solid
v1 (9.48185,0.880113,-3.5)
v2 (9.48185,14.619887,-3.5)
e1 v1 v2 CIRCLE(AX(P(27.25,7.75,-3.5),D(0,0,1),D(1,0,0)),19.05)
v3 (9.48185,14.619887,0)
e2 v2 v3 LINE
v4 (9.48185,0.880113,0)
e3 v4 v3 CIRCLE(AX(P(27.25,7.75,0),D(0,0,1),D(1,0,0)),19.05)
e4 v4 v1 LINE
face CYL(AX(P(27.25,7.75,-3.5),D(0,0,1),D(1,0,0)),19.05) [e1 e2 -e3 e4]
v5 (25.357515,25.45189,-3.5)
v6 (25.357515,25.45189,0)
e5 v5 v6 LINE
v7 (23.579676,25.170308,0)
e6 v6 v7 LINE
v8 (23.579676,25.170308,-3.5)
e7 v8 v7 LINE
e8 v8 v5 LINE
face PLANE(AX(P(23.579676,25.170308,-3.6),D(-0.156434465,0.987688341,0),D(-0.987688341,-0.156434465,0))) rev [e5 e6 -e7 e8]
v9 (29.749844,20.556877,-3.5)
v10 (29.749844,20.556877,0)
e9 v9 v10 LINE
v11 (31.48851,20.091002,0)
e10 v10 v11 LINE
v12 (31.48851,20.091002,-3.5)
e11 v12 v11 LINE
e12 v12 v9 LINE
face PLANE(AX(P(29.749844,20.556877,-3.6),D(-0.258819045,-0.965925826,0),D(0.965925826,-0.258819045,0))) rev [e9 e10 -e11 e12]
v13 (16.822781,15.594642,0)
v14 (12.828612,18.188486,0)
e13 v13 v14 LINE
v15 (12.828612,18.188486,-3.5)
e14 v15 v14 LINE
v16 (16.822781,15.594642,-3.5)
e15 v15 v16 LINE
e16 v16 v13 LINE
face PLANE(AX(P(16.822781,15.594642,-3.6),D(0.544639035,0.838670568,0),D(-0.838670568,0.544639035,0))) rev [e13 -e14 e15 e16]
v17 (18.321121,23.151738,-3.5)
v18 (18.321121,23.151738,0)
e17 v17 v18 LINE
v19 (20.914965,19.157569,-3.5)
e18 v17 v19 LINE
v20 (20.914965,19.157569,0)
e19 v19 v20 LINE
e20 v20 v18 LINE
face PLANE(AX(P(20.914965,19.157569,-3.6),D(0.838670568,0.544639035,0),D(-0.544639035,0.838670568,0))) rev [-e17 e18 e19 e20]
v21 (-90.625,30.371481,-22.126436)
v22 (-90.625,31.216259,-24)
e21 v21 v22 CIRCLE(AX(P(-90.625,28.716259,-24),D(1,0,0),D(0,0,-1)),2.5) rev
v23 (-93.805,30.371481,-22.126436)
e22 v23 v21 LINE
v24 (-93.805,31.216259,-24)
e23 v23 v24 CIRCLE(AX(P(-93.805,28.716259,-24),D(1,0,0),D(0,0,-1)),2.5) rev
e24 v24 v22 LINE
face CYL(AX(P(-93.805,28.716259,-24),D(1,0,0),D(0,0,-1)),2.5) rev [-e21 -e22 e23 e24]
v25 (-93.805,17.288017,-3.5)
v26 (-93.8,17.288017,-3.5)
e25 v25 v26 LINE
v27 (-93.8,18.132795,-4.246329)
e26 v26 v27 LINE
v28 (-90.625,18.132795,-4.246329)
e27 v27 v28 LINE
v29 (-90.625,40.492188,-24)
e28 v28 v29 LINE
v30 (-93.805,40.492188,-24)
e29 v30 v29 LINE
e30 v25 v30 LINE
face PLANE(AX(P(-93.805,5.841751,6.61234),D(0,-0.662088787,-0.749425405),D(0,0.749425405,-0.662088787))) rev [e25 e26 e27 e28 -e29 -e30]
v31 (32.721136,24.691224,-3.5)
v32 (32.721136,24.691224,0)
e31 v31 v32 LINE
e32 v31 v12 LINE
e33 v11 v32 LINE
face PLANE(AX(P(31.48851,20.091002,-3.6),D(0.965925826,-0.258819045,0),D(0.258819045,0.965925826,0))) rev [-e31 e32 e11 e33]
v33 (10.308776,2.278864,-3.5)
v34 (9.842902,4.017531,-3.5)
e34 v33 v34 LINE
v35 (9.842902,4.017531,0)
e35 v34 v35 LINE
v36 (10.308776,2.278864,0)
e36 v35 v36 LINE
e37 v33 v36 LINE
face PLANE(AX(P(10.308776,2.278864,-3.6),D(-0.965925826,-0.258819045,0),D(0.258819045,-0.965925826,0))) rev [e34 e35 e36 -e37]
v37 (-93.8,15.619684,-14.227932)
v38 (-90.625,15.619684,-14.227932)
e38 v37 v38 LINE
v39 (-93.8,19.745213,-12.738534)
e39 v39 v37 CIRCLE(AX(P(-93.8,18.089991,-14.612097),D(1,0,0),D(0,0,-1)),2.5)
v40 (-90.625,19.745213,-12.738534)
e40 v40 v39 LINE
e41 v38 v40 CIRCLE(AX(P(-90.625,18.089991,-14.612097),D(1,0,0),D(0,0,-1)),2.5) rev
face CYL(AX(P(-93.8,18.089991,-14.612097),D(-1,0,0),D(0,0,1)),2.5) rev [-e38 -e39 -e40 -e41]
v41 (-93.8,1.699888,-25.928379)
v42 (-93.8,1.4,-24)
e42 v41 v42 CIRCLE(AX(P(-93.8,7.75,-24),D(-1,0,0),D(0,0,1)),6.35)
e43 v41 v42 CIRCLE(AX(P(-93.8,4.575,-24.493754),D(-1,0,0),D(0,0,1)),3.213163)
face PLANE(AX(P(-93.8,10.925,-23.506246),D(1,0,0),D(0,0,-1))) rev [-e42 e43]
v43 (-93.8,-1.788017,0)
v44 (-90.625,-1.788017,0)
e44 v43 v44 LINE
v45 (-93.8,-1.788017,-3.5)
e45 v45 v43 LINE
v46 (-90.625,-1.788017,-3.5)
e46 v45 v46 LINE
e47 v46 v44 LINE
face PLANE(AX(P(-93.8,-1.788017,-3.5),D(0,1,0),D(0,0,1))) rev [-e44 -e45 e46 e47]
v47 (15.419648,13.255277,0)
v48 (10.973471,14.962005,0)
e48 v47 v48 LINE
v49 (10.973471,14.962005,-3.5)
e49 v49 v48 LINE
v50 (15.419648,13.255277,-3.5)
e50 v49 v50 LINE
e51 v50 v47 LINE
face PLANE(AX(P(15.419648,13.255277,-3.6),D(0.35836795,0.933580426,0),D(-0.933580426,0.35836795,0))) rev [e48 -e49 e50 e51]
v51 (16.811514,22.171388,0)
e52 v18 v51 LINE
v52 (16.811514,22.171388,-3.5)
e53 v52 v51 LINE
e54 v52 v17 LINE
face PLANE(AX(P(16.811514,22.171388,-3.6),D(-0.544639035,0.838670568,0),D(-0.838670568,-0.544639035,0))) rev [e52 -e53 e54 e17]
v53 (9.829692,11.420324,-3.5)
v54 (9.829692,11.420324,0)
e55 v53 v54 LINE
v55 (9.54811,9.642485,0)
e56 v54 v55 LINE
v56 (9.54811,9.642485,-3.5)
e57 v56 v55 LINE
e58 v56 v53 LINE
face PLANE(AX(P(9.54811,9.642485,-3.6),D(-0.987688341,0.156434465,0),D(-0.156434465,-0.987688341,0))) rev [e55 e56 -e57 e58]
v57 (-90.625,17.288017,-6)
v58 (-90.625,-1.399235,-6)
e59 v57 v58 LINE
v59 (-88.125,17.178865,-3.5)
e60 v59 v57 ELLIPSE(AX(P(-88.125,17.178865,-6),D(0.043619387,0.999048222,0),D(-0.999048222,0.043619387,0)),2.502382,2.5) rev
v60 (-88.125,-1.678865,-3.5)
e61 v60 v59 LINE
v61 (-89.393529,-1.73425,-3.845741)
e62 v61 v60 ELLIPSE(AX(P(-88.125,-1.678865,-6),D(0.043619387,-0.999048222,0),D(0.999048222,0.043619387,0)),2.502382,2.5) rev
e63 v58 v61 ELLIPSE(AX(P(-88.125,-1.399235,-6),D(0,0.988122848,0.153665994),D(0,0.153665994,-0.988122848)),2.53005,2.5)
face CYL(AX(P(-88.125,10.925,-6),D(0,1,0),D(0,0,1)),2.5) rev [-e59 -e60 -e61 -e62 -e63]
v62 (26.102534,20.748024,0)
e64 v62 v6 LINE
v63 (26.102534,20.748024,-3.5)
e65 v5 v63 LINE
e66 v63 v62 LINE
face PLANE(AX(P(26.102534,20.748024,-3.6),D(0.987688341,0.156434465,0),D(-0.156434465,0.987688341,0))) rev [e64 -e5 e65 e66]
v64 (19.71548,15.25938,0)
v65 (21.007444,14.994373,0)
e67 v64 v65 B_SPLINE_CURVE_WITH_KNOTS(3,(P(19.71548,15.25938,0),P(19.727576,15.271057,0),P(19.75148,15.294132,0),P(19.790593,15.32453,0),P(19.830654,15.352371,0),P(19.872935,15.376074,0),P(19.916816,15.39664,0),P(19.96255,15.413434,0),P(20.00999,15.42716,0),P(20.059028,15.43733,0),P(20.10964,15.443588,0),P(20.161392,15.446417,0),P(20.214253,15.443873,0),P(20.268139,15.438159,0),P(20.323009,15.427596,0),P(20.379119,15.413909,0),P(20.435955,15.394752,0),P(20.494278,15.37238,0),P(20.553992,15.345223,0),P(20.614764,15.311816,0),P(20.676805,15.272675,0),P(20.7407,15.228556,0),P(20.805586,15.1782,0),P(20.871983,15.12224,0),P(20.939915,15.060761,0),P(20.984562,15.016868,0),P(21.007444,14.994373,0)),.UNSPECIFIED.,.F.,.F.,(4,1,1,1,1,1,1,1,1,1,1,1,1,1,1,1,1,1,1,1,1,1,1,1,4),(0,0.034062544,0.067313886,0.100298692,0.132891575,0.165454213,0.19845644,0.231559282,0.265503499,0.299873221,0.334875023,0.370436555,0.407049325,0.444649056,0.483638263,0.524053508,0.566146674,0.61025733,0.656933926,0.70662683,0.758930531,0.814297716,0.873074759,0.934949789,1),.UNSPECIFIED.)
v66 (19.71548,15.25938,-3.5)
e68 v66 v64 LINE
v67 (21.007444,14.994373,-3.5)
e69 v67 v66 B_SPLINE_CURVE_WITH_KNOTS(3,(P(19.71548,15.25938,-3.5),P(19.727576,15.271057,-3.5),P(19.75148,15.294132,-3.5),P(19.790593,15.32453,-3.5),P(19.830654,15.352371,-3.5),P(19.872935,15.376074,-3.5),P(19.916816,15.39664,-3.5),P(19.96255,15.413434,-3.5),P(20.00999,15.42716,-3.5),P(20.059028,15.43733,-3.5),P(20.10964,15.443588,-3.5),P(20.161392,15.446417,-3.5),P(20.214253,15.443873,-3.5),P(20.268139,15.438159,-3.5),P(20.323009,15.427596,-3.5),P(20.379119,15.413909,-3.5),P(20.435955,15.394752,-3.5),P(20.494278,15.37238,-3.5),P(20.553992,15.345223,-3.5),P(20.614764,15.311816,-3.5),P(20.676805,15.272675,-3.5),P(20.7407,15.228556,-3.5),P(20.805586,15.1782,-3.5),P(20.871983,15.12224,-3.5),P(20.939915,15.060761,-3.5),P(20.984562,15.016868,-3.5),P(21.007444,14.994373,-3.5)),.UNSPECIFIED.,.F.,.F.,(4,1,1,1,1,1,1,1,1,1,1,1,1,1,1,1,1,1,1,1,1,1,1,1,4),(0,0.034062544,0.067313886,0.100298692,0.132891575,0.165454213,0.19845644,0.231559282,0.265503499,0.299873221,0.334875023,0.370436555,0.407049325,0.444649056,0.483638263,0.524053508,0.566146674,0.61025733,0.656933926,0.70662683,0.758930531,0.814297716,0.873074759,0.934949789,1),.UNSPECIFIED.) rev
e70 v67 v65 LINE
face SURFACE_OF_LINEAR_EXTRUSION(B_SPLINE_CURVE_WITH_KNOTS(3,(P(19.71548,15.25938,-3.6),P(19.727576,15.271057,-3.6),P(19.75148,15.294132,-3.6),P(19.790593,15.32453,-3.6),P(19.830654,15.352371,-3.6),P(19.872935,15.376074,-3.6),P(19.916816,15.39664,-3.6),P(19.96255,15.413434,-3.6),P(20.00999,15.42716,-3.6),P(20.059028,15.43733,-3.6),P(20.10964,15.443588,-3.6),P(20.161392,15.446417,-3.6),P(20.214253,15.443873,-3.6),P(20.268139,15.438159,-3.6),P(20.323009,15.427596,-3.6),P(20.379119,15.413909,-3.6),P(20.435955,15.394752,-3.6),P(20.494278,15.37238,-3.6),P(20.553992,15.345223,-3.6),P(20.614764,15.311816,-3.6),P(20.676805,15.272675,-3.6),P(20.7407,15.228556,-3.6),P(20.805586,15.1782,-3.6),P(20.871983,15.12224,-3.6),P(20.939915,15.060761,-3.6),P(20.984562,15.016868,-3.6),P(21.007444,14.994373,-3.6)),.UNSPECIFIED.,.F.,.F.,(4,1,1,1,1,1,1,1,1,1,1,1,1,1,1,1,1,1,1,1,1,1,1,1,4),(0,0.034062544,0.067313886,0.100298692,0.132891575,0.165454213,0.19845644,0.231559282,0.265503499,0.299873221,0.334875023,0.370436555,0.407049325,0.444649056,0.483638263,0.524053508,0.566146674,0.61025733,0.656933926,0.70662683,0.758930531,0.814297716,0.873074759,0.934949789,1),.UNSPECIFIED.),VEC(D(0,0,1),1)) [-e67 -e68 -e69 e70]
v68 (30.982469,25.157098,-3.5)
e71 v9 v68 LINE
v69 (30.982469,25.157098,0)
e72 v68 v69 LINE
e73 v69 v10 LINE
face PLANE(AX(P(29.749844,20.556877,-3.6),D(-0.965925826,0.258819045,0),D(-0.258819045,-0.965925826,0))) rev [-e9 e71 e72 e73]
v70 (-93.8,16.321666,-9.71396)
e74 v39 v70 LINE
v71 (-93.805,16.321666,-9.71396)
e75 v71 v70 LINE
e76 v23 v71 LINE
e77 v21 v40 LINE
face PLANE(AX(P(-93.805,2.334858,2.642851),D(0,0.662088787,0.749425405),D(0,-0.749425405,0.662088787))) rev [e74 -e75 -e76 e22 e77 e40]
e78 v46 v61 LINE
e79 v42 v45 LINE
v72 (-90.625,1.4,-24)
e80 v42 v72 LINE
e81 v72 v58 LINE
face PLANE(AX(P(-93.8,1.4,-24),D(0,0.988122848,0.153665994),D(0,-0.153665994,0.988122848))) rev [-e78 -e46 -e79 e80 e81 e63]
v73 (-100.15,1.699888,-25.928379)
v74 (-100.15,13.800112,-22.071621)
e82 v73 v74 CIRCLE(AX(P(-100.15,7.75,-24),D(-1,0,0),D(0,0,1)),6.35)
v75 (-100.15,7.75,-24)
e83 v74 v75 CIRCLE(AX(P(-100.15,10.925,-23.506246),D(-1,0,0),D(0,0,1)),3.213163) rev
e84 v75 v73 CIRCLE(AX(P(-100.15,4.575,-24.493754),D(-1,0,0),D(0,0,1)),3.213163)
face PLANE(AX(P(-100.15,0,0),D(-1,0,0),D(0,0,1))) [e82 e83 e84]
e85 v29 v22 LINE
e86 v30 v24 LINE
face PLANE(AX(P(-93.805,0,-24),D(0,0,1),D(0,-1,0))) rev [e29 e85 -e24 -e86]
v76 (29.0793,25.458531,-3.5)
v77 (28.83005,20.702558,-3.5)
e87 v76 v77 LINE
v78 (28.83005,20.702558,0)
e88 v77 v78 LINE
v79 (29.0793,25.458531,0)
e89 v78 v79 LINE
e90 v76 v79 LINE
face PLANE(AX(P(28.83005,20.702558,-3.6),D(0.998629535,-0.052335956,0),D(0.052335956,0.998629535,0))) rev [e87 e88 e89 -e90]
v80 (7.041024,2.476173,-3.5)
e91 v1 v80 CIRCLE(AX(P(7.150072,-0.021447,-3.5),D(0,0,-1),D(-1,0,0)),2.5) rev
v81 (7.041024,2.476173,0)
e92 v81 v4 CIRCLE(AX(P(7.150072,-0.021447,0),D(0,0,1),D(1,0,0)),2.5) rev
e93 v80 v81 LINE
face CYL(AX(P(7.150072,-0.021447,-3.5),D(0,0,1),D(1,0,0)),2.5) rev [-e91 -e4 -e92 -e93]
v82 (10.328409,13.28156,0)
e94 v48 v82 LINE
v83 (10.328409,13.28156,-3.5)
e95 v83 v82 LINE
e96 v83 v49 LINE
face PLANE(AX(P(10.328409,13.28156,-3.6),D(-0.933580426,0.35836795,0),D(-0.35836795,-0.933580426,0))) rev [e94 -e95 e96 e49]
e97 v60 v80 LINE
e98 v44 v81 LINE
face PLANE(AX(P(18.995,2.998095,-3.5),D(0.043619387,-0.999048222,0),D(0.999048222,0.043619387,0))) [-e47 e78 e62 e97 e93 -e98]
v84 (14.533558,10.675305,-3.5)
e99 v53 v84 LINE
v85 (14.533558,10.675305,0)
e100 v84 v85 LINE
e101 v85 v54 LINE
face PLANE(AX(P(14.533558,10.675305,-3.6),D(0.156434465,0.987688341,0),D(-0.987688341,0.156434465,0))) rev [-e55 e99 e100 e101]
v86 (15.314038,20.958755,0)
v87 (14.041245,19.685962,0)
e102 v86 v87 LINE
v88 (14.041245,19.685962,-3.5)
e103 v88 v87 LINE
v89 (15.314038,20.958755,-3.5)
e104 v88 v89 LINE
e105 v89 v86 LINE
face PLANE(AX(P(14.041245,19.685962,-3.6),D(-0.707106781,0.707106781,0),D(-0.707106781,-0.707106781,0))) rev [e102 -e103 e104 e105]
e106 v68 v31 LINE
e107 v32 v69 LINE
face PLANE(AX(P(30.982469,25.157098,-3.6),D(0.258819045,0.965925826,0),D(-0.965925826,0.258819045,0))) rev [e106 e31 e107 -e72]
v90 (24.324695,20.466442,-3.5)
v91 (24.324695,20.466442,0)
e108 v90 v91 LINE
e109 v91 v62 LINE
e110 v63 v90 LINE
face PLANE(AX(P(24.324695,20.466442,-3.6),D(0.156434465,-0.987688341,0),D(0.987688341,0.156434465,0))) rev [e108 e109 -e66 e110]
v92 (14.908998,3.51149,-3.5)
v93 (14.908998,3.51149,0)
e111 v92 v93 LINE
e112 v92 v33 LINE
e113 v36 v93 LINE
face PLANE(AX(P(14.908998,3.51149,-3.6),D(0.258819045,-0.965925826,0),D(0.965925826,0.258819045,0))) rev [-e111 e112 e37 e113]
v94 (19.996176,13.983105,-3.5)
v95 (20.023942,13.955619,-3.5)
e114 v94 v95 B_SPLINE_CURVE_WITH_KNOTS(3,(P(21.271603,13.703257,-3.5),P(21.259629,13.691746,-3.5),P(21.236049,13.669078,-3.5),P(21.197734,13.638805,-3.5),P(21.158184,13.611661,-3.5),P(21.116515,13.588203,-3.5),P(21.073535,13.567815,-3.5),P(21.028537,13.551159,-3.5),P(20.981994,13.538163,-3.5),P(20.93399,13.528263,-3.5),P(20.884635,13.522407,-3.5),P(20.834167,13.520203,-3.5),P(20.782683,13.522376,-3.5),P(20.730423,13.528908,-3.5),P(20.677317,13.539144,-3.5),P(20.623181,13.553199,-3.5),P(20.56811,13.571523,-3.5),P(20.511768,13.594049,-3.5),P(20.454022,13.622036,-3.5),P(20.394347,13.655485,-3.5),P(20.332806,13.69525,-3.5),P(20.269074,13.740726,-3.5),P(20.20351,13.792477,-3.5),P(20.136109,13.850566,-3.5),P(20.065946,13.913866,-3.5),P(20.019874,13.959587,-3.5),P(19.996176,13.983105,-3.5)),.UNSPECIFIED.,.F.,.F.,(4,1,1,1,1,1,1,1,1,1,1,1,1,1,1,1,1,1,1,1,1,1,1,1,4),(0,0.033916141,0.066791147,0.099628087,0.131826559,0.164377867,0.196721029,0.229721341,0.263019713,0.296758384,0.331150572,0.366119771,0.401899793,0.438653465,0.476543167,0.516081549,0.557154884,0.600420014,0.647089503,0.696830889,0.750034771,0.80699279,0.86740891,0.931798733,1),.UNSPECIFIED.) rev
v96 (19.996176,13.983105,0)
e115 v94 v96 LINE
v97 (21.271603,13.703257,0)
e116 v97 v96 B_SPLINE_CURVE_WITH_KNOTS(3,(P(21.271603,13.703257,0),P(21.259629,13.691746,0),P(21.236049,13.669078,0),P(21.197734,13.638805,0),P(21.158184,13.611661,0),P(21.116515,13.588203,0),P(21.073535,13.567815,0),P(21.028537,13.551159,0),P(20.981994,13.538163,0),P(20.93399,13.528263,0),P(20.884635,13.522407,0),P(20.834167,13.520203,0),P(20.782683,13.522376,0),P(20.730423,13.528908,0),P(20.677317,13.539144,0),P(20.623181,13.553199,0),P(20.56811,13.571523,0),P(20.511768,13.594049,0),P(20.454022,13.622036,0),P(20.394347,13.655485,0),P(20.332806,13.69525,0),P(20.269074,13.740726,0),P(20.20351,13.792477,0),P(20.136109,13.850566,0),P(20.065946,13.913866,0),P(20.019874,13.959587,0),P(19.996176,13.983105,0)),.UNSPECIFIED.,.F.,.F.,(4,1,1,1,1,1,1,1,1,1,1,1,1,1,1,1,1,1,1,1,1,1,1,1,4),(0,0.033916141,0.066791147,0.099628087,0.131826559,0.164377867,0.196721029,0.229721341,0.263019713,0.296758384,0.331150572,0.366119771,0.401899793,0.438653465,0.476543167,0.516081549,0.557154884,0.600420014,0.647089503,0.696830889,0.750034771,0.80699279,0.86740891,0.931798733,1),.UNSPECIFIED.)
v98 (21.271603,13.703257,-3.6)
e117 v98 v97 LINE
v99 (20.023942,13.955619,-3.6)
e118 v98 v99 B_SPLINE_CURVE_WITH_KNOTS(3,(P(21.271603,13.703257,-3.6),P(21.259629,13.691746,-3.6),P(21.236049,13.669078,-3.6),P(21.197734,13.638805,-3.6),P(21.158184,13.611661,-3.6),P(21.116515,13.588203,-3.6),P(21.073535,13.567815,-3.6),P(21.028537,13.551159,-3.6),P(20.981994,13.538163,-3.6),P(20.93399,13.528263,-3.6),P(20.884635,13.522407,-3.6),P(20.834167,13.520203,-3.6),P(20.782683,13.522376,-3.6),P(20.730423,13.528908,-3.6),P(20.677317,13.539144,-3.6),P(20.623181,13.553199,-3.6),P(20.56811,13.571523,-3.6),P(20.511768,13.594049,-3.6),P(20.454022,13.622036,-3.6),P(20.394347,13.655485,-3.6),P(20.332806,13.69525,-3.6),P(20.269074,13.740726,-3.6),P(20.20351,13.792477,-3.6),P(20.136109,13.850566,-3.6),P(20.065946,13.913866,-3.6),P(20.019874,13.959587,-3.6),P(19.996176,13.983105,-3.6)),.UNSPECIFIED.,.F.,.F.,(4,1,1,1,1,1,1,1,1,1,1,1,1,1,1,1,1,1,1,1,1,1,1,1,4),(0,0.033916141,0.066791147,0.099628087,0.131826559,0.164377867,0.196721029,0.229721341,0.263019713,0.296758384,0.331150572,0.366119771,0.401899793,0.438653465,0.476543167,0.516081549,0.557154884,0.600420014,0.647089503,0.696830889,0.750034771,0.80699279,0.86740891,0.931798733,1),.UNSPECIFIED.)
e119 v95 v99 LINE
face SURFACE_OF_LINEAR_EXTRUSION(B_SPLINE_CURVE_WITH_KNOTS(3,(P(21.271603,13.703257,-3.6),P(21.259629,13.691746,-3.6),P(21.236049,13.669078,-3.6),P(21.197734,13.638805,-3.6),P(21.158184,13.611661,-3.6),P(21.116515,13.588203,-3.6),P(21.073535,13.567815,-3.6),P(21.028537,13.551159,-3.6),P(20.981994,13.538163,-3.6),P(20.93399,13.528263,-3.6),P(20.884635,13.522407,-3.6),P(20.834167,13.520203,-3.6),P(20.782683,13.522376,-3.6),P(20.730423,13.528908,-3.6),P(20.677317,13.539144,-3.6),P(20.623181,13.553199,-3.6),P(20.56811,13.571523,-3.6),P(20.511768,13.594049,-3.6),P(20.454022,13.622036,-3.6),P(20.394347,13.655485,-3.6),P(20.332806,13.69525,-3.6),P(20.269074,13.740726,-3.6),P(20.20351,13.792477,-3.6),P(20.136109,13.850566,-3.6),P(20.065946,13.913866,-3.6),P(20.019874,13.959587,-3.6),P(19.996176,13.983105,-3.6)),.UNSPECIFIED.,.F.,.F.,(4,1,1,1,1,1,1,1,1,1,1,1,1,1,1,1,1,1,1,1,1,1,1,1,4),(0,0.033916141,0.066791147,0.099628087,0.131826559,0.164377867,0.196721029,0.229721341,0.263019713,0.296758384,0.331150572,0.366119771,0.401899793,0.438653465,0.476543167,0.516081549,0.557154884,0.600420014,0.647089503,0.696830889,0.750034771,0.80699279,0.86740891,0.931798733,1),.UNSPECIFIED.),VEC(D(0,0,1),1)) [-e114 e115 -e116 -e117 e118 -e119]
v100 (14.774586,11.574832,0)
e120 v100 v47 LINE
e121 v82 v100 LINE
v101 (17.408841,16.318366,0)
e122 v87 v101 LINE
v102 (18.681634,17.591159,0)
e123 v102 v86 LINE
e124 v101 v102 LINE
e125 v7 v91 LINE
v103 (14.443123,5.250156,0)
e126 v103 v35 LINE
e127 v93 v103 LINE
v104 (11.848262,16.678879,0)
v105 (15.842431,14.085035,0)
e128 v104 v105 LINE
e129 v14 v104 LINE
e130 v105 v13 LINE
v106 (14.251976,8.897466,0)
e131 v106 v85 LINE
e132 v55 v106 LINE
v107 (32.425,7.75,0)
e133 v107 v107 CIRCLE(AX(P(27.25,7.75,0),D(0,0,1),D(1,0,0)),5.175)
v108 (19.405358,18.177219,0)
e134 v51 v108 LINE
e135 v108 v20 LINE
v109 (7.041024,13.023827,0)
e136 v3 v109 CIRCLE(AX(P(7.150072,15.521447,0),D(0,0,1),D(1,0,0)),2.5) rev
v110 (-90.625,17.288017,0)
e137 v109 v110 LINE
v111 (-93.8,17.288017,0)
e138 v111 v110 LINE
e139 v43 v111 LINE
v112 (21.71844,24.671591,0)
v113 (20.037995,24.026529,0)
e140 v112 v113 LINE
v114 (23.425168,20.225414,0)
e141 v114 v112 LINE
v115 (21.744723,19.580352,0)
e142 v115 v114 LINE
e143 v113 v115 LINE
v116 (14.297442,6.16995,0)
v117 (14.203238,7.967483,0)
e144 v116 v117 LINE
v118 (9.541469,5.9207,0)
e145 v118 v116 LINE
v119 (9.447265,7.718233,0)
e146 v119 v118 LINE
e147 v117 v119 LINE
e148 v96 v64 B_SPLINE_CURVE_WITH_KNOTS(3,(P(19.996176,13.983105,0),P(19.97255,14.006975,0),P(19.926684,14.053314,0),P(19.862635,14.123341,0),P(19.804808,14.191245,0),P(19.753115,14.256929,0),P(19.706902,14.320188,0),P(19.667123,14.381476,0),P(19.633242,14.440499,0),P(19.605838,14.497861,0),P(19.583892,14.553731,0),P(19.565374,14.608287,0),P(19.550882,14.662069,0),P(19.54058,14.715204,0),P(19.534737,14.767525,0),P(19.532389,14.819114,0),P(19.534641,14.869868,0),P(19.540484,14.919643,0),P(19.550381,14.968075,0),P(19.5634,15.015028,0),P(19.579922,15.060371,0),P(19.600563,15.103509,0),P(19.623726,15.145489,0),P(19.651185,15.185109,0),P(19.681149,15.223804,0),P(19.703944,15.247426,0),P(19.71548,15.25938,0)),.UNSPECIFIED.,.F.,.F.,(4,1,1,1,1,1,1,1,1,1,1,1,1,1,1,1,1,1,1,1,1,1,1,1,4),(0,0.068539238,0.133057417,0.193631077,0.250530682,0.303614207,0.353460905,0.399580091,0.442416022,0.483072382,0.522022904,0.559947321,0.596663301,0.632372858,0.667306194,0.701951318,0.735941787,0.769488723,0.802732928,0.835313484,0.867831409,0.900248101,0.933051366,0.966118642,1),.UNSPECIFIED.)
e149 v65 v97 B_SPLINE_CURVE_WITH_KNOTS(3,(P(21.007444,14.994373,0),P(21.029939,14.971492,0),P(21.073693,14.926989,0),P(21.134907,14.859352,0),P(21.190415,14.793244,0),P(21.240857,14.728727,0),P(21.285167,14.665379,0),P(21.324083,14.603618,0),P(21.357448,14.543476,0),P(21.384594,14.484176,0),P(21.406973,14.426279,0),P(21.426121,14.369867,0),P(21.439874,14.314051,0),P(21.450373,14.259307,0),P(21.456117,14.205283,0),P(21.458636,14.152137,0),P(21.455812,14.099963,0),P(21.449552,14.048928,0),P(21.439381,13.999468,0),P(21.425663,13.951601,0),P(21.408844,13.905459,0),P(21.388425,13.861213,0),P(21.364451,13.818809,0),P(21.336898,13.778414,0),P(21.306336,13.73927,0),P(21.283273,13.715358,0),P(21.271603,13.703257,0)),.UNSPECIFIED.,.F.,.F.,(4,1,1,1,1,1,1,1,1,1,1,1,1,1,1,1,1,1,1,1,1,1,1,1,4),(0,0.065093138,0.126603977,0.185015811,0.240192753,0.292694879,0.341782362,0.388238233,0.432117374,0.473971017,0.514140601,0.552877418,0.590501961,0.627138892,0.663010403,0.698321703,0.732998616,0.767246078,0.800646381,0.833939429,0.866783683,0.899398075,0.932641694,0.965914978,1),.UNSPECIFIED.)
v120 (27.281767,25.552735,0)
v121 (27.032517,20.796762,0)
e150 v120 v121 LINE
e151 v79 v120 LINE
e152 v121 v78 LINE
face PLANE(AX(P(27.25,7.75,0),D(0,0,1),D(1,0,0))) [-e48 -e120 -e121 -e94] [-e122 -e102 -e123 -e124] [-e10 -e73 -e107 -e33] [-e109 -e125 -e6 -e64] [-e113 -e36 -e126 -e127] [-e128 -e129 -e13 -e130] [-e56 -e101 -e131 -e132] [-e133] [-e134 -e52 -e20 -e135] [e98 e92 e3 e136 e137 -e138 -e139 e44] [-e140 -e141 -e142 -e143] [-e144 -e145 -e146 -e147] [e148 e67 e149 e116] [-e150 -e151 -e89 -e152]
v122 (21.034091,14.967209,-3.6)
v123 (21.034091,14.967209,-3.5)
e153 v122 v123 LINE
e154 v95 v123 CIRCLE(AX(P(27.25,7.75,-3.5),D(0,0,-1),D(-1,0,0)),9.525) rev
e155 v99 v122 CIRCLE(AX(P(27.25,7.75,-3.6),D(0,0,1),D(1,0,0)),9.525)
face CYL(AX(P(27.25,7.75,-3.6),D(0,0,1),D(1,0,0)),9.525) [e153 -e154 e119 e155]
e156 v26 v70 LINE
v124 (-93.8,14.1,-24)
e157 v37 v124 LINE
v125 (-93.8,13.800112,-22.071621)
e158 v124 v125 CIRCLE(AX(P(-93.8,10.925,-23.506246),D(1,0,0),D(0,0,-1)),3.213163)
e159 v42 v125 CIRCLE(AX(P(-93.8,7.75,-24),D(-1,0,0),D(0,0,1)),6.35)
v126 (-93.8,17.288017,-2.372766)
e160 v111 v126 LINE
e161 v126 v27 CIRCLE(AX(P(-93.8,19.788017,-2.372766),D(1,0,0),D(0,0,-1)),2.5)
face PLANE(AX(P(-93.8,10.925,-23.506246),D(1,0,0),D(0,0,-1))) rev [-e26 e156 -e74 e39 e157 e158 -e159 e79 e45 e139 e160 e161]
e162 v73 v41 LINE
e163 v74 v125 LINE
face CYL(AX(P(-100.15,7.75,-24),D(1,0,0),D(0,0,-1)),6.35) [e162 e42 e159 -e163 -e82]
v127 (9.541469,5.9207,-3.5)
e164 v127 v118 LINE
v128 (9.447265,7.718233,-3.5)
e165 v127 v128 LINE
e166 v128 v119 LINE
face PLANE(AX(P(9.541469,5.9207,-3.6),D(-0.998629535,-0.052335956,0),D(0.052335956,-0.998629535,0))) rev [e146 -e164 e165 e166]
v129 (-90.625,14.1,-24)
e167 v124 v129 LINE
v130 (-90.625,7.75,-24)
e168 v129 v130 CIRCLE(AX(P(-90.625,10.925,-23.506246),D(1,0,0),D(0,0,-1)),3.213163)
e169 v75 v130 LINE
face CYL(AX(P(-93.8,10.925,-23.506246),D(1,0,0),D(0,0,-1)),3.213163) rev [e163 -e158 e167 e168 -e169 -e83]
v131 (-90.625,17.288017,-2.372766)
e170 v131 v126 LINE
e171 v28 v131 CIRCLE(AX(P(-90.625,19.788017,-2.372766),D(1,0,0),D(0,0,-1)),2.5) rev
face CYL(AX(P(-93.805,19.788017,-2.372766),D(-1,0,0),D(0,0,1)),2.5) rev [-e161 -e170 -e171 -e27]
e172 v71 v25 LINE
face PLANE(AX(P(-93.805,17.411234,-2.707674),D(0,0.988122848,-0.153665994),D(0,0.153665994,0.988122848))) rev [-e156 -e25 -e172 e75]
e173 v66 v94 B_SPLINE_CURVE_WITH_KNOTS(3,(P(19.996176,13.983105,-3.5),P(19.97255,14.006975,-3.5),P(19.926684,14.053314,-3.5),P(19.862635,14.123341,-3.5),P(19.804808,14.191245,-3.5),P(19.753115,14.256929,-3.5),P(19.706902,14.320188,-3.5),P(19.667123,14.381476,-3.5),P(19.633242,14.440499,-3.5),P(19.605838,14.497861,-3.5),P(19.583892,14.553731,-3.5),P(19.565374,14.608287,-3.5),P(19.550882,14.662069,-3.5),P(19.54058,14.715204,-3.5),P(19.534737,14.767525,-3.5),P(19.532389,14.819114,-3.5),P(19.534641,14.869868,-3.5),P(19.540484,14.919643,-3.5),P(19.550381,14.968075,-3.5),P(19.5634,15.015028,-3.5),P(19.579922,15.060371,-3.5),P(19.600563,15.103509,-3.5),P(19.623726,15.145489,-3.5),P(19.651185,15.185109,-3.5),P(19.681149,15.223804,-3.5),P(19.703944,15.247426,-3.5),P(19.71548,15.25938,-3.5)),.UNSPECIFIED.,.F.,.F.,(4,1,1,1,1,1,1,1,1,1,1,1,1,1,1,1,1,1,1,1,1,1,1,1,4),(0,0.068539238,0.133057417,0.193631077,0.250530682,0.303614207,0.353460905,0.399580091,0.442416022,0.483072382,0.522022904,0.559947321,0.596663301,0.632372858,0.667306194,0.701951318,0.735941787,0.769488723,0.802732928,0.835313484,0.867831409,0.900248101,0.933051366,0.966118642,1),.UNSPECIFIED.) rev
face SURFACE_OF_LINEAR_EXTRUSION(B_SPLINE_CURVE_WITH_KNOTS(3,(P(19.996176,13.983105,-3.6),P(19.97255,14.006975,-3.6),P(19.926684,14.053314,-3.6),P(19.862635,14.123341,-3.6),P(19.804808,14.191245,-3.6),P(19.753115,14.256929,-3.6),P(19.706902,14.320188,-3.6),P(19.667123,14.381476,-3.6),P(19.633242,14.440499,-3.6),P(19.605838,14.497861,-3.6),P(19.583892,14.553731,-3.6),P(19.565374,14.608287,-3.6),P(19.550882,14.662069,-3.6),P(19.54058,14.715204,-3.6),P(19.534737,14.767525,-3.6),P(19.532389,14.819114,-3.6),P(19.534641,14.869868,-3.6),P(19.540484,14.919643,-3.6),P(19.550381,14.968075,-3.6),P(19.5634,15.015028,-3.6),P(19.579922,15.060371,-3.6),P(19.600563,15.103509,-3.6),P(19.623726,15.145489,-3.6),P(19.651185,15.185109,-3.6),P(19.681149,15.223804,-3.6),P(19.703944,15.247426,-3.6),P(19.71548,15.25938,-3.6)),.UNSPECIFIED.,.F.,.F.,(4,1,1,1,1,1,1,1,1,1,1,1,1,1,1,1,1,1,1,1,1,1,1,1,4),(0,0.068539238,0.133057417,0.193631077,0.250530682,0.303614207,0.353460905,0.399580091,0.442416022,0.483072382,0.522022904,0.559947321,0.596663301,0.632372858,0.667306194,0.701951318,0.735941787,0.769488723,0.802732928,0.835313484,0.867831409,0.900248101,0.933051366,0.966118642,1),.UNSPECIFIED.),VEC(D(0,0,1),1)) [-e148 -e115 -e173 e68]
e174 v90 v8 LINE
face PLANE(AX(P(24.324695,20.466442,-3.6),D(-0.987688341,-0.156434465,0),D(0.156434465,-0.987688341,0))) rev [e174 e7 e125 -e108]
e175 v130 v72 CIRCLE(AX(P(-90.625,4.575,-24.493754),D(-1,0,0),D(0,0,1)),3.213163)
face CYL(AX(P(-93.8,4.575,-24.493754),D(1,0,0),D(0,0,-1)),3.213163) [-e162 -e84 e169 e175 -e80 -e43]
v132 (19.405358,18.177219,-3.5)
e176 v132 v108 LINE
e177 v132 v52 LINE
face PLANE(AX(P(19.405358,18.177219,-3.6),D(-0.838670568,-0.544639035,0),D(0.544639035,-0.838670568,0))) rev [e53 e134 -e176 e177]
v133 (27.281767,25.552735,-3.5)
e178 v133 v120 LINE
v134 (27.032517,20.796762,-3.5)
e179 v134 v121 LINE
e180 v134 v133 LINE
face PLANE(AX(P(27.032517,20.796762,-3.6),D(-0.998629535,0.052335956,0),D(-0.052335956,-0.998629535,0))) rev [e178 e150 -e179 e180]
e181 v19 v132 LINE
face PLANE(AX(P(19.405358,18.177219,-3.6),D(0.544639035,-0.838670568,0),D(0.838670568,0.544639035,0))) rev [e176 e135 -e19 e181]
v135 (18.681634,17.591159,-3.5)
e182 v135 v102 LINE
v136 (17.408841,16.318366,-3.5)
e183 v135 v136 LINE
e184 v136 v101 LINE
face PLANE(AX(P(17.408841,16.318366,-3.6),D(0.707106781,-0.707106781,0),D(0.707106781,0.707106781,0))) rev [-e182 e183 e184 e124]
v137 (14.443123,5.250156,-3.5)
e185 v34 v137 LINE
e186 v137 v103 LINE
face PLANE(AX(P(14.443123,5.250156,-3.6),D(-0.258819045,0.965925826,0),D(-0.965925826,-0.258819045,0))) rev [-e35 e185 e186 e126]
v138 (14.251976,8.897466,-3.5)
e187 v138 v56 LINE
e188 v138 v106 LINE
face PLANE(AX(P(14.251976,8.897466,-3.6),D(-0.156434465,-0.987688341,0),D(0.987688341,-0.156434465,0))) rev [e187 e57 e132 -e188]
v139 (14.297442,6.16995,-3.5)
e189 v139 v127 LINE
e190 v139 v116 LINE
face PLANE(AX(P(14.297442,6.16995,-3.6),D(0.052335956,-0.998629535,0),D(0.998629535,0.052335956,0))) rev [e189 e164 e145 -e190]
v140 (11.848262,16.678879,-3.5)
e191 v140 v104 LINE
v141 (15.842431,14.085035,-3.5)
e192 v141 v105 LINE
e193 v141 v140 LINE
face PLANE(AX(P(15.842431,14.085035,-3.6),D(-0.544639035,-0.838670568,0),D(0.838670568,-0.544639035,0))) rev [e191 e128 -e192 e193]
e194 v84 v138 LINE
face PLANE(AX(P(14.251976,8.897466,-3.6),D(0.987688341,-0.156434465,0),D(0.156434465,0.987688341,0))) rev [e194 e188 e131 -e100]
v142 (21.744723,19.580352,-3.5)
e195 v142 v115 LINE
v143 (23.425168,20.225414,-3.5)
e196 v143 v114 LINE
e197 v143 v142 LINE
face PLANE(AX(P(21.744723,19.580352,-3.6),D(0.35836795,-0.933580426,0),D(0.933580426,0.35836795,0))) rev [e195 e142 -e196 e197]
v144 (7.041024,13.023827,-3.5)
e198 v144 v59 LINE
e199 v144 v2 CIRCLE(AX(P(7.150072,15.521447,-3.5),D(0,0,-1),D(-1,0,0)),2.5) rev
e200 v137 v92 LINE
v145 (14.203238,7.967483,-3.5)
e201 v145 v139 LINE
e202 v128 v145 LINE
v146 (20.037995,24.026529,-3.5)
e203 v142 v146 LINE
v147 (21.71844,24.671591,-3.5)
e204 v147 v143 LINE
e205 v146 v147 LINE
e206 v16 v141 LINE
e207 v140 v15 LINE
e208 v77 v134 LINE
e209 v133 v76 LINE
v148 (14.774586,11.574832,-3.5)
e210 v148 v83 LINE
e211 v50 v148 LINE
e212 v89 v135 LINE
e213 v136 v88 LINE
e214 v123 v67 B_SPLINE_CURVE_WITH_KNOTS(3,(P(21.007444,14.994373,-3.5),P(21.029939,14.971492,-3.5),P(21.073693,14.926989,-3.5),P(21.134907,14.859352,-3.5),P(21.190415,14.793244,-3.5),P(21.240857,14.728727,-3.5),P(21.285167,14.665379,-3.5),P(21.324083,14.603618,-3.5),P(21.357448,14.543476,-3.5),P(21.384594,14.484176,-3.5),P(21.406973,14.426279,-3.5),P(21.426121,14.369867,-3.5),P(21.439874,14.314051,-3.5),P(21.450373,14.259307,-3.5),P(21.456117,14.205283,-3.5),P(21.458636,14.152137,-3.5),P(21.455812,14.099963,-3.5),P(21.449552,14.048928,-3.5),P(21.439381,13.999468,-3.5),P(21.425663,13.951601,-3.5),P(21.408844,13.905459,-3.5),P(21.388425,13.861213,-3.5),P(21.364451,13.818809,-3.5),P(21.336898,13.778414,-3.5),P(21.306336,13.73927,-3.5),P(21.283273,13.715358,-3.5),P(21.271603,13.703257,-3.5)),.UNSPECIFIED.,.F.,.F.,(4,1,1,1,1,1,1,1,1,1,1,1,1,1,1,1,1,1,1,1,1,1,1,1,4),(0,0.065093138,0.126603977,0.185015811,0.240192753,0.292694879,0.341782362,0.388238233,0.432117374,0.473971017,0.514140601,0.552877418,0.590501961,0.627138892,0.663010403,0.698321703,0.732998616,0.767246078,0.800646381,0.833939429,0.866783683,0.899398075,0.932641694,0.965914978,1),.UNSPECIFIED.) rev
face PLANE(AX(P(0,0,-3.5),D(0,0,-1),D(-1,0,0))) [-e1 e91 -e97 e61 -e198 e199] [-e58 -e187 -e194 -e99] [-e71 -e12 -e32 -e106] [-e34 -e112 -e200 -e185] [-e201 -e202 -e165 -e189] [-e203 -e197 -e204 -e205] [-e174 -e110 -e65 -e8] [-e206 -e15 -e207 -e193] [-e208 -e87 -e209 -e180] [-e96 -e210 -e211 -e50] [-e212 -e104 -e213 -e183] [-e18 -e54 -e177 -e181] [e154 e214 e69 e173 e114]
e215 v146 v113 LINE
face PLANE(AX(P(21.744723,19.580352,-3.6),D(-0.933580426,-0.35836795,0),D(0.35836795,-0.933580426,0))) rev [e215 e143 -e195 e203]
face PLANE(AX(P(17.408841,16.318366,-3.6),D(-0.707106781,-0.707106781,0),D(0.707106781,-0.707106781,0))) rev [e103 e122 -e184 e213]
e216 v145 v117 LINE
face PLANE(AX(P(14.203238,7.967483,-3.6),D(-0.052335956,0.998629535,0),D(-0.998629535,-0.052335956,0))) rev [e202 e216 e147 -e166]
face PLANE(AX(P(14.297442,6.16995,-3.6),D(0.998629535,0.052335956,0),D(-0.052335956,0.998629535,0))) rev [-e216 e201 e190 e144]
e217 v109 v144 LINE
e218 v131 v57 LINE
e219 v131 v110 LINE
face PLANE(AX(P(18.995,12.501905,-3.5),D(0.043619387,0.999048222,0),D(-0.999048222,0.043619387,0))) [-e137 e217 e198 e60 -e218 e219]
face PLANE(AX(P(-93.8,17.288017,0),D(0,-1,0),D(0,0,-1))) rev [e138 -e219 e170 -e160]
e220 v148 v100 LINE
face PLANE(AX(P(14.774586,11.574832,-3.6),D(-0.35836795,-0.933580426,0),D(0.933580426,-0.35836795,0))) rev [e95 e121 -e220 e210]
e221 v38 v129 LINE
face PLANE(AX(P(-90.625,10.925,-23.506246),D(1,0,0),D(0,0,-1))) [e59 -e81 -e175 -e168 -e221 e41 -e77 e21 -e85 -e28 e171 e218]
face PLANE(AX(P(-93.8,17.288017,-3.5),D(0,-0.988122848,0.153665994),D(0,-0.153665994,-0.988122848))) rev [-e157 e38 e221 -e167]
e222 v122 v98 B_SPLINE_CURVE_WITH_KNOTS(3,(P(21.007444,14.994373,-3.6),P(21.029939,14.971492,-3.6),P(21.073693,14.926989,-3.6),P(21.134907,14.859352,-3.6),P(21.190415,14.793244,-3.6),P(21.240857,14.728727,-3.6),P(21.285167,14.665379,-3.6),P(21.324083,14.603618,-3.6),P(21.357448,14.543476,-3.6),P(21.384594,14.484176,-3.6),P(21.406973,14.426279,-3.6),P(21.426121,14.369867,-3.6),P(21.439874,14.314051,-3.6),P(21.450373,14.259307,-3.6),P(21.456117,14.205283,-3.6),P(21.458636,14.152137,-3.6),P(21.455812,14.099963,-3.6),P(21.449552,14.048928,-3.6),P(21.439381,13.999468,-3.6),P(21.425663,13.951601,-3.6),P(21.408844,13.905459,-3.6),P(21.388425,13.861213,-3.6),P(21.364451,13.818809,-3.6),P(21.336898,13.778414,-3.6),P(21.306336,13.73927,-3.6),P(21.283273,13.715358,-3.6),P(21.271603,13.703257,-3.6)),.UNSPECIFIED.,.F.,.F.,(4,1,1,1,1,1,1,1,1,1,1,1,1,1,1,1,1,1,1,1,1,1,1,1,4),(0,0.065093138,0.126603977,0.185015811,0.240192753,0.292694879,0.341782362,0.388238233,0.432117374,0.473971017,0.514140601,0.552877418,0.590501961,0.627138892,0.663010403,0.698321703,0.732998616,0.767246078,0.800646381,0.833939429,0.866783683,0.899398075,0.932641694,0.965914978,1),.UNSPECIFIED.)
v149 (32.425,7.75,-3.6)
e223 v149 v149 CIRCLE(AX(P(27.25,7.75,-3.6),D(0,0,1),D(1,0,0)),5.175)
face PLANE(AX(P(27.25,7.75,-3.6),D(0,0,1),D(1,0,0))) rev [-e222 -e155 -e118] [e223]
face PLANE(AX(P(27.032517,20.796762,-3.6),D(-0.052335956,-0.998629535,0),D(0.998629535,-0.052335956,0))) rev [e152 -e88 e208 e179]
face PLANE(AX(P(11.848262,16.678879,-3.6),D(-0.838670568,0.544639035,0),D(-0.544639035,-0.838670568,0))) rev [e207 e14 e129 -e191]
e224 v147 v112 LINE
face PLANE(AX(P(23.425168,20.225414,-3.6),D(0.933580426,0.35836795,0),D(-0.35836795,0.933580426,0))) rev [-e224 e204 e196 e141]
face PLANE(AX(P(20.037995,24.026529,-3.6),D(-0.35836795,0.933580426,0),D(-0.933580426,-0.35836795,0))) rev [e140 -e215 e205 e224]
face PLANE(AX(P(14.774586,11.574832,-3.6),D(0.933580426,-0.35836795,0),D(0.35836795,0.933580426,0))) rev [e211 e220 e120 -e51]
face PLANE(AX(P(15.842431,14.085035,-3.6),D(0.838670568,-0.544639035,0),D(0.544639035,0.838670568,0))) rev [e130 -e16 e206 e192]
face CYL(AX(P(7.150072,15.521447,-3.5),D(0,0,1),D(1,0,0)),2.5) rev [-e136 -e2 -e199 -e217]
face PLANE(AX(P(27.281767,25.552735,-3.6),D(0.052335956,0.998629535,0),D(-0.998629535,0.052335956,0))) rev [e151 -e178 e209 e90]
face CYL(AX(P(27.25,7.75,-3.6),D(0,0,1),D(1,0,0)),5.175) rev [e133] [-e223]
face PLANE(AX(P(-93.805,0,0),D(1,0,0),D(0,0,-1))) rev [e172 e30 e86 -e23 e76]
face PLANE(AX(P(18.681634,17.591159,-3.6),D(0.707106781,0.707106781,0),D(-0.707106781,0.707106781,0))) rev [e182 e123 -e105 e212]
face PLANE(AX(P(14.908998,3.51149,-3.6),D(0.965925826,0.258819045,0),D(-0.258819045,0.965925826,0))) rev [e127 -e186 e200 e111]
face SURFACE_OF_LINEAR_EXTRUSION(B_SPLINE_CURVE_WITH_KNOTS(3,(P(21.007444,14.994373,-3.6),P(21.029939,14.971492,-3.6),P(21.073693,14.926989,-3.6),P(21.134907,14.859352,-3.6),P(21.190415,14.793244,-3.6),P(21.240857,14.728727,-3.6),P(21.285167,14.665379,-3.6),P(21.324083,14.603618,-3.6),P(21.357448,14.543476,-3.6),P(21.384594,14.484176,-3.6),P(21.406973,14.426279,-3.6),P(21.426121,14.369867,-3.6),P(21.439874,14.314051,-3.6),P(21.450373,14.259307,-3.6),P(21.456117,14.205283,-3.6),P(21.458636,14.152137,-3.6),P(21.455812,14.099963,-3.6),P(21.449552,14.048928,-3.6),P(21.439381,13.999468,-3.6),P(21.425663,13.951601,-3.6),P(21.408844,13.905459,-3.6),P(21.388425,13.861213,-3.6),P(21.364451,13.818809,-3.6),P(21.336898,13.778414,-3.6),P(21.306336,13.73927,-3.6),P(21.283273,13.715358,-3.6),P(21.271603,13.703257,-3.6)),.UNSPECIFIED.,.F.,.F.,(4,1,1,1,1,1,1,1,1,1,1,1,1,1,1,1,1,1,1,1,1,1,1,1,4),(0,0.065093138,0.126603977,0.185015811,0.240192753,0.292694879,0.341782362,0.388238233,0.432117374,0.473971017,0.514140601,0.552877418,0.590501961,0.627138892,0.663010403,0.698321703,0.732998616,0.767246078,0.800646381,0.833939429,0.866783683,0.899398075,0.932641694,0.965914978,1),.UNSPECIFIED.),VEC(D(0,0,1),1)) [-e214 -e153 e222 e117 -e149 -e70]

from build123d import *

# Parameters (mm, degrees)
SKETCH1_R           = 9.525
SKETCH1_R_2         = 5.175
BOSS_EXTRUDE1_DEPTH = 3.6
BOSS_EXTRUDE2_DEPTH = 3.5
SKETCH3_R           = 19.05
SKETCH3_R_2         = 5.175
BOSS_EXTRUDE3_DEPTH = 3.5
CUT_EXTRUDE1_DEPTH  = 95.573202468
BOSS_EXTRUDE4_DEPTH = 3.175
BOSS_EXTRUDE5_DEPTH = 6.35
BOSS_EXTRUDE6_DEPTH = 3.18
FILLET1_R           = 2.5


with BuildPart() as part:
    # Sketch1 → Boss-Extrude1 (new body)
    with BuildSketch(Plane.XY):
        with Locations((27.25, 7.75)):
            Circle(SKETCH1_R)
        with Locations((27.25, 7.75)):
            Circle(SKETCH1_R_2, mode=Mode.SUBTRACT)
    extrude(amount=-BOSS_EXTRUDE1_DEPTH)

    # Sketch2 → Boss-Extrude2 (add)
    with BuildSketch(Plane.XY):
        Polygon((18.995, 12.501904881), (-90.625, 17.288017443), (-90.625, -1.788017443), (18.995, 2.998095119), align=None)
    extrude(amount=-BOSS_EXTRUDE2_DEPTH)

    # Sketch3 → Boss-Extrude3 (add)
    with BuildSketch(Plane.XY):
        with Locations((27.25, 7.75)):
            Circle(SKETCH3_R)
        with Locations((27.25, 7.75)):
            Circle(SKETCH3_R_2, mode=Mode.SUBTRACT)
    extrude(amount=-BOSS_EXTRUDE3_DEPTH)

    # Sketch4 → Cut-Extrude1 (cut, through all)
    # profile 1 of 12: a face of its own
    with BuildSketch(Plane.XY):
        Polygon((19.405357851, 18.177218987), (16.811514446, 22.171387567), (18.321121469, 23.15173783), (20.914964873, 19.15756925), align=None)
    # profile 2 of 12: a face of its own
    with BuildSketch(Plane.XY):
        Polygon((17.408841373, 16.318366421), (18.681633579, 17.591158627), (15.314037534, 20.958754673), (14.041245327, 19.685962466), align=None)
    # profile 3 of 12: a face of its own
    with BuildSketch(Plane.XY):
        Polygon((21.744722833, 19.580352047), (20.037995473, 24.026528829), (21.718440241, 24.671591138), (23.425167601, 20.225414357), align=None)
    # profile 4 of 12: a face of its own
    with BuildSketch(Plane.XY):
        Polygon((24.324694845, 20.466441955), (23.579675705, 25.170307677), (25.357514718, 25.451889714), (26.102533858, 20.748023992), align=None)
    # profile 5 of 12: a face of its own
    with BuildSketch(Plane.XY):
        Polygon((27.032516729, 20.796762329), (27.281766721, 25.552735489), (29.079299883, 25.458530767), (28.830049892, 20.702557608), align=None)
    # profile 6 of 12: a face of its own
    with BuildSketch(Plane.XY):
        Polygon((29.749843676, 20.556876584), (30.982469378, 25.157098332), (32.721135866, 24.691224051), (31.488510163, 20.091002303), align=None)
    # profile 7 of 12: a face of its own
    with BuildSketch(Plane.XY):
        Polygon((15.84243075, 14.085035127), (11.84826217, 16.678878531), (12.828612433, 18.188485554), (16.822781013, 15.594642149), align=None)
    # profile 8 of 12: a face of its own
    with BuildSketch(Plane.XY):
        Polygon((14.774585643, 11.574832399), (10.328408862, 13.281559759), (10.973471171, 14.962004527), (15.419647953, 13.255277167), align=None)
    # profile 9 of 12: a face of its own
    with BuildSketch(Plane.XY):
        Polygon((14.251976008, 8.897466142), (9.548110286, 9.642485282), (9.829692323, 11.420324295), (14.533558045, 10.675305155), align=None)
    # profile 10 of 12: a face of its own
    with BuildSketch(Plane.XY):
        Polygon((14.297442392, 6.169950108), (9.541469233, 5.920700117), (9.447264511, 7.718233279), (14.203237671, 7.967483271), align=None)
    # profile 11 of 12: a face of its own
    with BuildSketch(Plane.XY):
        Polygon((14.908997697, 3.511489837), (10.308775949, 2.278864134), (9.842901668, 4.017530622), (14.443123416, 5.250156324), align=None)
    # profile 12 of 12: a face of its own
    with BuildSketch(Plane.XY):
        with BuildLine():
            add(Edge.make_bspline(
                [(19.996175693, 13.983105039), (19.972549804, 14.006974852), (19.926684107, 14.053314085), (19.862635122, 14.123340739), (19.804807719, 14.191245488), (19.753115011, 14.256928744), (19.706902346, 14.320187557), (19.667123485, 14.381475924), (19.633241886, 14.440499093), (19.605838218, 14.49786121), (19.583891907, 14.553730575), (19.565373741, 14.60828689), (19.550882076, 14.662068546), (19.540580443, 14.715204363), (19.534737441, 14.767524979), (19.532388566, 14.819113596), (19.53464102, 14.869868179), (19.540484051, 14.919643175), (19.550380726, 14.968074585), (19.563399735, 15.015027998), (19.579921539, 15.060371004), (19.600563009, 15.10350851), (19.62372625, 15.145488903), (19.651184569, 15.185108897), (19.681148524, 15.223804161), (19.703943722, 15.247425917), (19.715479913, 15.259380413)],
                knots=[0, 0, 0, 0, 1.644941701, 3.193378015, 4.647145852, 6.012736372, 7.286740979, 8.483061719, 9.58992218, 10.61798452, 11.593737178, 12.528549707, 13.438735705, 14.319919232, 15.176948591, 16.015348648, 16.846831638, 17.662602897, 18.467729349, 19.265590275, 20.047523624, 20.827953815, 21.605954429, 22.393232775, 23.186847407, 24, 24, 24, 24], degree=3))
            add(Edge.make_bspline(
                [(19.715479913, 15.259380413), (19.72757601, 15.271056951), (19.751480133, 15.294131948), (19.79059328, 15.32453002), (19.830653616, 15.352371474), (19.872934823, 15.376073956), (19.916815537, 15.396640202), (19.962550005, 15.413433609), (20.009989946, 15.427159873), (20.059028168, 15.437329522), (20.109640093, 15.443588369), (20.161391726, 15.446416818), (20.214253243, 15.443872509), (20.268139075, 15.438159389), (20.323009446, 15.427596366), (20.379119371, 15.413908829), (20.435954787, 15.394752005), (20.494277642, 15.372380194), (20.553991919, 15.345222785), (20.614763563, 15.31181632), (20.6768047, 15.272675401), (20.740699924, 15.228555913), (20.805586165, 15.178199697), (20.871982932, 15.122240246), (20.939915396, 15.060760529), (20.984561985, 15.016868227), (21.007443722, 14.994373068)],
                knots=[0, 0, 0, 0, 0.81750105, 1.615533254, 2.407168602, 3.189397808, 3.970901104, 4.762954563, 5.55742278, 6.372083968, 7.196957306, 8.037000563, 8.890477321, 9.76918381, 10.671577351, 11.607318308, 12.577284202, 13.587520184, 14.64617593, 15.76641423, 16.959043917, 18.21433275, 19.543145185, 20.953794228, 22.438794936, 24, 24, 24, 24], degree=3))
            add(Edge.make_bspline(
                [(21.007443722, 14.994373068), (21.029939345, 14.971491973), (21.07369258, 14.926989007), (21.134906952, 14.859351767), (21.190415056, 14.793244214), (21.24085702, 14.728727202), (21.285167215, 14.665378577), (21.324082766, 14.603618046), (21.35744776, 14.543475592), (21.384594418, 14.48417647), (21.406973112, 14.426279284), (21.426121387, 14.369867226), (21.439873538, 14.314050657), (21.450373252, 14.259306853), (21.456117386, 14.205282675), (21.45863553, 14.152136819), (21.455811599, 14.099963135), (21.449552444, 14.048928037), (21.439380503, 13.999468399), (21.425663125, 13.951600834), (21.408844197, 13.905459094), (21.388425087, 13.861212706), (21.364450808, 13.818808922), (21.336898184, 13.778413534), (21.306335612, 13.739270233), (21.283273208, 13.715357657), (21.271603044, 13.703257283)],
                knots=[0, 0, 0, 0, 1.562235313, 3.038495437, 4.440379466, 5.764626062, 7.024677084, 8.202776689, 9.317717587, 10.370816988, 11.375304419, 12.339374423, 13.269058028, 14.172047064, 15.051333417, 15.912249674, 16.759720868, 17.591966788, 18.41390586, 19.215513145, 20.014546285, 20.802808402, 21.585553806, 22.383400645, 23.181959475, 24, 24, 24, 24], degree=3))
            add(Edge.make_bspline(
                [(21.271603044, 13.703257283), (21.259629026, 13.691746239), (21.23604856, 13.66907751), (21.197734192, 13.638805411), (21.158183947, 13.611660672), (21.116515089, 13.588202529), (21.073534989, 13.567814799), (21.028537333, 13.551158533), (20.981994239, 13.538163004), (20.933989646, 13.528262893), (20.884634953, 13.522407258), (20.834167195, 13.520202748), (20.782683445, 13.522376174), (20.73042296, 13.5289079), (20.67731692, 13.539143901), (20.623181435, 13.553199413), (20.568109964, 13.571523386), (20.511768493, 13.594048796), (20.454021813, 13.622036447), (20.394346939, 13.655485363), (20.332806089, 13.695249792), (20.269074183, 13.740726075), (20.203509794, 13.792477155), (20.136108776, 13.850566204), (20.065946419, 13.913865736), (20.019874065, 13.959587171), (19.996175693, 13.983105039)],
                knots=[0, 0, 0, 0, 0.813987375, 1.602987522, 2.391074088, 3.163837422, 3.945068801, 4.721304689, 5.513312182, 6.312473106, 7.122201215, 7.947613738, 8.786874495, 9.645595022, 10.52768317, 11.43703601, 12.385957169, 13.371717227, 14.410080332, 15.530148071, 16.72394133, 18.000834515, 19.367826948, 20.817813834, 22.363169582, 24, 24, 24, 24], degree=3))
        make_face()
        with BuildLine():
            add(Edge.make_bspline(
                [(20.139491665, 14.120484847), (20.159842261, 14.10026479), (20.199282005, 14.06107803), (20.258825996, 14.006696987), (20.315157902, 13.956648767), (20.36946228, 13.91227584), (20.421015188, 13.872453316), (20.470698769, 13.838793642), (20.517294119, 13.809391318), (20.562274922, 13.785969667), (20.60570856, 13.766694324), (20.648080537, 13.750402661), (20.6900298, 13.737655615), (20.731300233, 13.728383676), (20.771914432, 13.721759849), (20.812064975, 13.718808576), (20.851623834, 13.719298353), (20.902639916, 13.723732634), (20.963368961, 13.736271903), (21.030845369, 13.761355865), (21.091551409, 13.796275379), (21.125667075, 13.82699342), (21.142703471, 13.842333137)],
                knots=[0, 0, 0, 0, 1.478828575, 2.865990936, 4.156734116, 5.36308544, 6.480889949, 7.513666501, 8.455984072, 9.319688948, 10.125381605, 10.904881632, 11.658652575, 12.383407565, 13.084213992, 13.778321268, 14.456017801, 15.121659285, 16.41638644, 17.638501444, 18.820734642, 20, 20, 20, 20], degree=3))
            add(Edge.make_bspline(
                [(21.142703471, 13.842333137), (21.158237309, 13.859333277), (21.189151543, 13.89316563), (21.223390961, 13.953683956), (21.248748637, 14.019779969), (21.261375212, 14.079417608), (21.265678182, 14.129451086), (21.266398281, 14.168334547), (21.262604874, 14.20785819), (21.256376505, 14.24827996), (21.246514017, 14.289516324), (21.233214252, 14.331341198), (21.217255365, 14.3741679), (21.20384511, 14.402126104), (21.196976975, 14.41644505)],
                knots=[0, 0, 0, 0, 1.339481627, 2.665731908, 4.025256516, 5.457778452, 6.202644314, 6.952873897, 7.722377096, 8.515238795, 9.337057588, 10.192268171, 11.074160362, 12, 12, 12, 12], degree=3))
            add(Edge.make_bspline(
                [(21.196976975, 14.41644505), (21.187973627, 14.434350806), (21.169636182, 14.47082011), (21.138179389, 14.524604008), (21.102557105, 14.578418398), (21.064470083, 14.633337931), (21.020981154, 14.687380173), (20.975094965, 14.742656801), (20.924859167, 14.797821639), (20.889404387, 14.83392842), (20.87133595, 14.852329131)],
                knots=[0, 0, 0, 0, 0.879877645, 1.792078736, 2.733637099, 3.713363695, 4.725250154, 5.778099888, 6.867676946, 8, 8, 8, 8], degree=3))
            add(Edge.make_bspline(
                [(20.87133595, 14.852329131), (20.85293091, 14.870394121), (20.817032712, 14.905629066), (20.762551079, 14.955367796), (20.709270708, 15.001073456), (20.657080441, 15.043043344), (20.605259068, 15.080077675), (20.554916646, 15.113936398), (20.50519563, 15.143058684), (20.456779694, 15.168776163), (20.409426539, 15.190288012), (20.363298462, 15.208334264), (20.31839389, 15.222725096), (20.274695443, 15.233953882), (20.232016746, 15.241307261), (20.190582362, 15.244613497), (20.150298797, 15.244724339), (20.099268913, 15.240215062), (20.039015716, 15.227597661), (19.972406236, 15.202799422), (19.911999572, 15.169092426), (19.878484301, 15.13852322), (19.861763968, 15.123272641)],
                knots=[0, 0, 0, 0, 1.331365774, 2.596768798, 3.807708333, 4.955277549, 6.052926775, 7.095188675, 8.086337056, 9.026368116, 9.92436562, 10.769928982, 11.582219143, 12.357378997, 13.097541491, 13.815019859, 14.500931769, 15.174783094, 16.457052075, 17.664667297, 18.834932833, 20, 20, 20, 20], degree=3))
            add(Edge.make_bspline(
                [(19.861763968, 15.123272641), (19.846235795, 15.106269619), (19.815119572, 15.072198013), (19.780593138, 15.01114956), (19.755313654, 14.944098329), (19.74268388, 14.88378236), (19.738333486, 14.833183193), (19.737770771, 14.79390012), (19.740933039, 14.754081851), (19.746875648, 14.713394638), (19.756141644, 14.672123078), (19.769056969, 14.630225368), (19.785373303, 14.587876991), (19.804420811, 14.544195974), (19.828111656, 14.499075995), (19.857227018, 14.452165818), (19.891065617, 14.402451645), (19.930829853, 14.350856026), (19.975390734, 14.296573577), (20.025112965, 14.239683187), (20.080125163, 14.180441993), (20.119308315, 14.140869004), (20.139491665, 14.120484847)],
                knots=[0, 0, 0, 0, 1.184098183, 2.372762314, 3.588199925, 4.868807811, 5.53452642, 6.205014416, 6.891934544, 7.591722619, 8.32367034, 9.070557309, 9.850147652, 10.662595738, 11.526400688, 12.475033872, 13.507930086, 14.625864108, 15.832355206, 17.128728501, 18.521000081, 20, 20, 20, 20], degree=3))
        make_face(mode=Mode.SUBTRACT)
    extrude(amount=-CUT_EXTRUDE1_DEPTH, mode=Mode.SUBTRACT)


with BuildPart() as cut_extrude1_kept_piece:
    # of the separate pieces the step leaves, the one the design keeps (cut_extrude1_pieces_kept)
    add(part.part.solids().sort_by_distance((8.921106691, 2.558259438, 0))[0])

    # Sketch5 → Boss-Extrude4 (add)
    with BuildSketch(Plane.ZY.offset(90.625)):
        with BuildLine():
            Line((0, 17.288017443), (-3.5, 17.288017443))
            Line((-3.5, 17.288017443), (-24, 14.1))
            ThreePointArc((-24, 14.1), (-20.29308285, 10.925), (-24, 7.75))
            ThreePointArc((-24, 7.75), (-27.70691715, 4.575), (-24, 1.4))
            Line((-24, 1.4), (-3.5, -1.788017443))
            Line((-3.5, -1.788017443), (0, -1.788017443))
            Line((0, -1.788017443), (0, 17.288017443))
        make_face()
    extrude(amount=BOSS_EXTRUDE4_DEPTH)

    # Sketch6 → Boss-Extrude5 (add)
    with BuildSketch(Plane.ZY.offset(93.8)):
        with BuildLine():
            ThreePointArc((-25.928379169, 1.699888118), (-24.975779061, 1.475419917), (-24, 1.4))
            ThreePointArc((-24, 1.4), (-19.509871939, 3.259871939), (-17.65, 7.75))
            ThreePointArc((-17.65, 7.75), (-18.873221883, 11.496818135), (-22.071620831, 13.800111882))
            ThreePointArc((-22.071620831, 13.800111882), (-20.444829224, 9.949220939), (-24, 7.75))
            ThreePointArc((-24, 7.75), (-27.555170776, 5.550779061), (-25.928379169, 1.699888118))
        make_face()
    extrude(amount=BOSS_EXTRUDE5_DEPTH)

    # Sketch9 → Boss-Extrude6 (add)
    with BuildSketch(Plane(origin=(-90.625, 0, 0), x_dir=(0, 0, -1), z_dir=(1, 0, 0))):
        Polygon((24, 40.4921875), (3.5, 17.288017443), (9.713960097, 16.32166558), (22.126436487, 30.371480848), (24, 32.4921875), align=None)
        with BuildLine():
            Line((24, 31.21625888), (24, 32.4921875))
            Line((24, 32.4921875), (22.126436487, 30.371480848))
            ThreePointArc((22.126436487, 30.371480848), (22.972394755, 30.995299788), (24, 31.21625888))
        make_face()
    extrude(amount=-BOSS_EXTRUDE6_DEPTH)

    # Fillet1
    # the kernel refuses this fillet: 2.5 mm, written as the material it adds along each edge
    with BuildSketch(Plane(origin=(-90.625, 17.288017443, -3.5), x_dir=(0, 0, 1), z_dir=(-1, 0, 0))) as fillet1_piece_1:
        with BuildLine():
            CenterArc((FILLET1_R * 0.450893725471, FILLET1_R), FILLET1_R, 221.45937079, 48.54062921)
            Line((-FILLET1_R * 0.29853167979, FILLET1_R * 0.337911212941), (0, 0))
            Line((0, 0), (FILLET1_R * 0.450893725471, 0))
        make_face()
    extrude(amount=3.175)
    with BuildSketch(Plane(origin=(-90.625, 16.32166558, -9.713960097), x_dir=(0, -0.15366599387417892, -0.9881228477910329), z_dir=(-1, 0, 0))) as fillet1_piece_2:
        with BuildLine():
            CenterArc((FILLET1_R * 1.82729194014, -FILLET1_R), FILLET1_R, 90, 122.61993432)
            Line((FILLET1_R * 0.98502704299, -FILLET1_R * 1.53906385803), (0, 0))
            Line((0, 0), (FILLET1_R * 1.82729194014, 0))
        make_face()
    extrude(amount=3.175)
    with BuildSketch(Plane(origin=(-90.625, 23.538017443, -3.5), x_dir=(1, 0, 0), z_dir=(0, -1, 0))) as fillet1_piece_3_section:
        with BuildLine():
            CenterArc((FILLET1_R, -FILLET1_R), FILLET1_R, 90, 90)
            Line((0, -FILLET1_R), (0, 0))
            Line((0, 0), (FILLET1_R, 0))
        make_face()
    fillet1_piece_3 = extrude(amount=31.576034886, mode=Mode.PRIVATE)
    fillet1_piece_3 = split(fillet1_piece_3, bisect_by=Plane(origin=(-89.653341221, 17.245593904, -4.057124871), z_dir=(-0.043619387365339574, -0.9990482215818577, 0)), keep=Keep.TOP, mode=Mode.PRIVATE)
    fillet1_piece_3 = split(fillet1_piece_3, bisect_by=Plane(origin=(-89.650267131, -1.745459687, -4.057124871), z_dir=(-0.0436193873653328, 0.9990482215818579, 0)), keep=Keep.TOP, mode=Mode.PRIVATE)
    fillet1_piece_3 = split(fillet1_piece_3, bisect_by=Plane(origin=(-90.066387829, -1.477366772, -5.49758592), z_dir=(0, 0.9881228477910331, 0.15366599387417806)), keep=Keep.TOP, mode=Mode.PRIVATE)
    add(fillet1_piece_3)
    with BuildSketch(Plane(origin=(8.921106691, 2.558259438, -3.5), x_dir=(0.31692008603336363, -0.9484522439578101, 0), z_dir=(0, 0, 1))) as fillet1_piece_4:
        with BuildLine():
            CenterArc((1.88545219, -2.497302737), FILLET1_R, 92.661756664, 71.361476718)
            Line((-0.517981279, -1.80918388), (0, 0))
            ThreePointArc((0, 0), (0.884676459, -0.020553146), (1.769352917, 0))
        make_face()
    extrude(amount=3.5)
    with BuildSketch(Plane(origin=(8.921106691, 12.941740562, -3.5), x_dir=(0.31692008603337163, 0.9484522439578075, 0), z_dir=(0, 0, 1))) as fillet1_piece_5:
        with BuildLine():
            CenterArc((1.88545219, 2.497302737), FILLET1_R, 195.976766619, 71.361476718)
            Line((-0.517981279, 1.80918388), (0, 0))
            ThreePointArc((0, 0), (0.884676459, 0.020553146), (1.769352917, 0))
        make_face()
    extrude(amount=3.5)


solid = cut_extrude1_kept_piece.part
